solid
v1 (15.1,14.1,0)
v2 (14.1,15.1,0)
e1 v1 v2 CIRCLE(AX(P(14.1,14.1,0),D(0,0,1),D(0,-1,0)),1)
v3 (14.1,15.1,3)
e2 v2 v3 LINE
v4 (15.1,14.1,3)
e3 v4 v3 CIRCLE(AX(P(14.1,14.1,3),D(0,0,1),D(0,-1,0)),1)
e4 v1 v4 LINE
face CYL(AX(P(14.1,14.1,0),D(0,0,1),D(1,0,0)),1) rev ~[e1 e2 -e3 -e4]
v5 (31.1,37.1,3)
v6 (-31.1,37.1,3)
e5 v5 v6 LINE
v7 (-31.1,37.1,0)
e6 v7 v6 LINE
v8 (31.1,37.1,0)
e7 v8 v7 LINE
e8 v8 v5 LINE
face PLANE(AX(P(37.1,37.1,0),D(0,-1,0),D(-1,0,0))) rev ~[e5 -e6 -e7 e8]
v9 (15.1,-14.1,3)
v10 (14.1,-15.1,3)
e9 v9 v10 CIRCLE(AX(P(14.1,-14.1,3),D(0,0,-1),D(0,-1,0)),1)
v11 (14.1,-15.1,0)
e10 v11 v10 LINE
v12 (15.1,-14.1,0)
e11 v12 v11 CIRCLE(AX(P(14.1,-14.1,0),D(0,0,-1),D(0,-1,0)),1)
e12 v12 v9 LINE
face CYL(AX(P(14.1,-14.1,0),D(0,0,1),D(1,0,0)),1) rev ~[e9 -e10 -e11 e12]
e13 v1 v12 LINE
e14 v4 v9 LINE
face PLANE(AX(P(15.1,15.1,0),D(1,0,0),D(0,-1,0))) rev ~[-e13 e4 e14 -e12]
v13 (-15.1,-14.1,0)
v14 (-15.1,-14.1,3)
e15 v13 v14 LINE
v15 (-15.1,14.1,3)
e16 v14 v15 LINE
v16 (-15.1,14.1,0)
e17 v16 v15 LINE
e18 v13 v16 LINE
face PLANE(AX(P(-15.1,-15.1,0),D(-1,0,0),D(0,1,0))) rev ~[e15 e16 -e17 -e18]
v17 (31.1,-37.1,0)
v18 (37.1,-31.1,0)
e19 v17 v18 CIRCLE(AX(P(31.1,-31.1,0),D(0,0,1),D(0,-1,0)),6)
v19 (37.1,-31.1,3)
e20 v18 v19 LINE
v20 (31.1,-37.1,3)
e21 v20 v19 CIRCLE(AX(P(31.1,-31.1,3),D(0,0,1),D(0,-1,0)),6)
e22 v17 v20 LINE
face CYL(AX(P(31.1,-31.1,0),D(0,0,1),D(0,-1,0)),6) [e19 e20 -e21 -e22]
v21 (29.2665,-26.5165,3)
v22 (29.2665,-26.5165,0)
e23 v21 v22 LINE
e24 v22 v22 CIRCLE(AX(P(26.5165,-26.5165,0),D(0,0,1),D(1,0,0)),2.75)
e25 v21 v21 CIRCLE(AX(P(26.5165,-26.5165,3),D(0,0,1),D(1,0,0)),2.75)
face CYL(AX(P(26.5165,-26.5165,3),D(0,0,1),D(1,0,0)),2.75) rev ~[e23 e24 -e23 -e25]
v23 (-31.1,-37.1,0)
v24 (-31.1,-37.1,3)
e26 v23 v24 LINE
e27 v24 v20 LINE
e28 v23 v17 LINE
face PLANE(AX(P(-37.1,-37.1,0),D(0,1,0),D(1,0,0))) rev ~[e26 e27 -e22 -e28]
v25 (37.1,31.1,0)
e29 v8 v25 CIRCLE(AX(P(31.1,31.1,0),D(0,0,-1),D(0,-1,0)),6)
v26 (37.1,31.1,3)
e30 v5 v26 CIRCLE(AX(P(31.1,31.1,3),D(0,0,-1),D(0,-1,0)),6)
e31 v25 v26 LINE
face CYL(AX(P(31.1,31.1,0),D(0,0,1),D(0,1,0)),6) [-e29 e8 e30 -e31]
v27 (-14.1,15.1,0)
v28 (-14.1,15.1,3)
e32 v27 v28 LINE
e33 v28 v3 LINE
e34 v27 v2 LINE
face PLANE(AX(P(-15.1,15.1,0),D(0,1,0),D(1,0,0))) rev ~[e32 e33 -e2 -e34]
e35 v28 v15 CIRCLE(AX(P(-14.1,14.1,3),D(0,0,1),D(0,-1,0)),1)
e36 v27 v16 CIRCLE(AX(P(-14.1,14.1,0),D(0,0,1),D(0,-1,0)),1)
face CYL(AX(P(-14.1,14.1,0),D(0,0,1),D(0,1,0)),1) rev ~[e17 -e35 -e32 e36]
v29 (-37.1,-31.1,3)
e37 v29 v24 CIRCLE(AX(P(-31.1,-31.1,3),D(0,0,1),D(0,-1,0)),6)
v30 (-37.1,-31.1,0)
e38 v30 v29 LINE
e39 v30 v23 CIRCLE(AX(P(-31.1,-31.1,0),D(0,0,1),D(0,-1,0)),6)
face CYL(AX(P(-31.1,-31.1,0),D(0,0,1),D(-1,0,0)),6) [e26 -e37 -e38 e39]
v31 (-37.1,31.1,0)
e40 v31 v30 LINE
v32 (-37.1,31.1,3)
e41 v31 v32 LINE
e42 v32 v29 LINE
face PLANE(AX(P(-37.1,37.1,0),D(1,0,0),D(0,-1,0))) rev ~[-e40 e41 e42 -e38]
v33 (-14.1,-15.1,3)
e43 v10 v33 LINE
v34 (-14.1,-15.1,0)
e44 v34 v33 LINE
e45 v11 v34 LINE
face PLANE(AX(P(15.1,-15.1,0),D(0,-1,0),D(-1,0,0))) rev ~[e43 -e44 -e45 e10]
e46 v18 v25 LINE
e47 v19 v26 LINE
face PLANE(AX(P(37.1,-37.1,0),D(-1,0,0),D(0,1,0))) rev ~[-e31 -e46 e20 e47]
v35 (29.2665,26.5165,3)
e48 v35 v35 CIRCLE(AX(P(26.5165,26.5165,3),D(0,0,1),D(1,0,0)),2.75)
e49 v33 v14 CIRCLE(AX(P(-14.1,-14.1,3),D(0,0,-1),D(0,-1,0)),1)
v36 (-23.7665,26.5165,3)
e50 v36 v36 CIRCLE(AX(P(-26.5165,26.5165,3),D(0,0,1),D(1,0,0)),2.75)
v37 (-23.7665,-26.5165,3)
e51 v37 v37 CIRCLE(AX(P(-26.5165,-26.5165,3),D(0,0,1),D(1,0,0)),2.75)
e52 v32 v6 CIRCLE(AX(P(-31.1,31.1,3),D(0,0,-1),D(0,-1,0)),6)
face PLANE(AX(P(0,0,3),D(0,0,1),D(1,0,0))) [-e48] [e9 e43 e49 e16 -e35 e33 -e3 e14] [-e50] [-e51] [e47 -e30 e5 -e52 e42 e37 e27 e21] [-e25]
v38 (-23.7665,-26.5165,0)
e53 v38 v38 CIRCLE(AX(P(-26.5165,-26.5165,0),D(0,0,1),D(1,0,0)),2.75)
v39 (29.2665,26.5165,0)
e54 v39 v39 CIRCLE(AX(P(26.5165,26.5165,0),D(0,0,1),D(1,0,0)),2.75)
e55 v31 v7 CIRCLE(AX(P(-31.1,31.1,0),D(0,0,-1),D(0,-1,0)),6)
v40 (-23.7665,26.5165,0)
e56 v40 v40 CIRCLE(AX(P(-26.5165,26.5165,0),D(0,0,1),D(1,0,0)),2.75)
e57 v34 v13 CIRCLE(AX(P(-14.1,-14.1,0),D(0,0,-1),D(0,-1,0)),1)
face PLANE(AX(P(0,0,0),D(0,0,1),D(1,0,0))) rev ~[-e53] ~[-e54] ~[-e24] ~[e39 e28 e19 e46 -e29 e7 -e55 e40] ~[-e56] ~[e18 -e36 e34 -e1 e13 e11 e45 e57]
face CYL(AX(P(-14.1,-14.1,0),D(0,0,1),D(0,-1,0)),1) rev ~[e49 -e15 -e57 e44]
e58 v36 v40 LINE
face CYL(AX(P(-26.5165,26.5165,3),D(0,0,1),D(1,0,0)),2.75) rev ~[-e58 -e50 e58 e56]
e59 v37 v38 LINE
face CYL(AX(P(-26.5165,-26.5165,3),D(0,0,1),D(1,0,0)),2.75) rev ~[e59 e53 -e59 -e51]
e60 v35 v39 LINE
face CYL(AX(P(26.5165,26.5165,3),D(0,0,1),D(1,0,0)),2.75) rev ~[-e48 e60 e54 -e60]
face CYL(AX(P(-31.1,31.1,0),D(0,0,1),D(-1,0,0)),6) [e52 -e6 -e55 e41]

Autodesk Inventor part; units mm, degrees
ref_plane "YZ Plane" through (0, 0, 0) normal (1, 0, 0) x (0, 1, 0)
ref_plane "XZ Plane" through (0, 0, 0) normal (0, 1, 0) x (-1, 0, 0)
ref_plane "XY Plane" through (0, 0, 0) normal (0, 0, 1) x (1, 0, 0)
sketch "Sketch1" plane through (0, 0, 0) normal (0, 0, 1) x (1, 0, 0)
  line L0 (-37.1, -37.1) -> (37.1, -37.1)
  line L1 (37.1, -37.1) -> (37.1, 37.1)
  line L2 (37.1, 37.1) -> (-37.1, 37.1)
  line L3 (-37.1, 37.1) -> (-37.1, -37.1)
  line L4 (-37.1, -37.1) -> (37.1, 37.1) construction
  line L5 (37.1, -37.1) -> (-37.1, 37.1) construction
  line L6 (15.1, -15.1) -> (-15.1, -15.1)
  line L7 (-15.1, -15.1) -> (-15.1, 15.1)
  line L8 (-15.1, 15.1) -> (15.1, 15.1)
  line L9 (15.1, 15.1) -> (15.1, -15.1)
  line L10 (15.1, -15.1) -> (-15.1, 15.1) construction
  line L11 (-15.1, -15.1) -> (15.1, 15.1) construction
  point P0 (0, 0)
  dimension "d172" = 30.2
  dimension "d181" = 22
  dimension "d187" = 22
extrude "Plate5" add sketch "Sketch1" along normal blind 3
sketch "Sketch9" plane through (0, 0, 3) normal (0, 0, 1) x (1, 0, 0)
  circle A0 centre (26.5165, -26.5165) radius 2.75
  line L0 (26.5165, 26.5165) -> (-26.5165, 26.5165) construction
  line L1 (-26.5165, 26.5165) -> (-26.5165, -26.5165) construction
  line L2 (-26.5165, -26.5165) -> (26.5165, -26.5165) construction
  line L3 (26.5165, -26.5165) -> (26.5165, 26.5165) construction
  line L4 (26.5165, 26.5165) -> (-26.5165, -26.5165) construction
  line L5 (-26.5165, 26.5165) -> (26.5165, -26.5165) construction
  circle A1 centre (-26.5165, -26.5165) radius 2.75
  circle A2 centre (26.5165, 26.5165) radius 2.75
  circle A3 centre (-26.5165, 26.5165) radius 2.75
  circle A4 centre (0, 0) radius 37.5 construction
  line L6 (-15.1, -15.1) -> (-15.1, 15.1) projected
  line L7 (-15.1, 15.1) -> (15.1, 15.1) projected
  line L8 (15.1, 15.1) -> (15.1, -15.1) projected
  line L9 (15.1, -15.1) -> (-15.1, -15.1) projected
  line L10 (37.1, -37.1) -> (-37.1, -37.1) projected
  line L11 (37.1, 37.1) -> (37.1, -37.1) projected
  line L12 (-37.1, 37.1) -> (37.1, 37.1) projected
  line L13 (-37.1, -37.1) -> (-37.1, 37.1) projected
  line L14 (-15, 15) -> (15, 15) construction
  line L15 (15, 15) -> (15, -15) construction
  line L16 (15, -15) -> (-15, -15) construction
  line L17 (-15, -15) -> (-15, 15) construction
  line L18 (-15, -15) -> (15, 15) construction
  dimension "d188" = 75
  dimension "d174" = 5.5
  dimension "d184" = 30
  dimension "d185" = 30
  dimension "d186" = 16.2868
extrude "Cut2" cut sketch "Sketch9" against normal blind 3 contours A0 | A1 | A2 | A3
fillet "Corner Round1" radius 6 4 edges at (37.1, 37.1, 1.5) (-37.1, 37.1, 1.5) (-37.1, -37.1, 1.5) (37.1, -37.1, 1.5)
fillet "Corner Round2" radius 1 4 edges at (-15.1, 15.1, 1.5) (-15.1, -15.1, 1.5) (15.1, -15.1, 1.5) (15.1, 15.1, 1.5)
properties part number "ANP 1425 FDS Way FLANGE" material "Stainless Steel"
